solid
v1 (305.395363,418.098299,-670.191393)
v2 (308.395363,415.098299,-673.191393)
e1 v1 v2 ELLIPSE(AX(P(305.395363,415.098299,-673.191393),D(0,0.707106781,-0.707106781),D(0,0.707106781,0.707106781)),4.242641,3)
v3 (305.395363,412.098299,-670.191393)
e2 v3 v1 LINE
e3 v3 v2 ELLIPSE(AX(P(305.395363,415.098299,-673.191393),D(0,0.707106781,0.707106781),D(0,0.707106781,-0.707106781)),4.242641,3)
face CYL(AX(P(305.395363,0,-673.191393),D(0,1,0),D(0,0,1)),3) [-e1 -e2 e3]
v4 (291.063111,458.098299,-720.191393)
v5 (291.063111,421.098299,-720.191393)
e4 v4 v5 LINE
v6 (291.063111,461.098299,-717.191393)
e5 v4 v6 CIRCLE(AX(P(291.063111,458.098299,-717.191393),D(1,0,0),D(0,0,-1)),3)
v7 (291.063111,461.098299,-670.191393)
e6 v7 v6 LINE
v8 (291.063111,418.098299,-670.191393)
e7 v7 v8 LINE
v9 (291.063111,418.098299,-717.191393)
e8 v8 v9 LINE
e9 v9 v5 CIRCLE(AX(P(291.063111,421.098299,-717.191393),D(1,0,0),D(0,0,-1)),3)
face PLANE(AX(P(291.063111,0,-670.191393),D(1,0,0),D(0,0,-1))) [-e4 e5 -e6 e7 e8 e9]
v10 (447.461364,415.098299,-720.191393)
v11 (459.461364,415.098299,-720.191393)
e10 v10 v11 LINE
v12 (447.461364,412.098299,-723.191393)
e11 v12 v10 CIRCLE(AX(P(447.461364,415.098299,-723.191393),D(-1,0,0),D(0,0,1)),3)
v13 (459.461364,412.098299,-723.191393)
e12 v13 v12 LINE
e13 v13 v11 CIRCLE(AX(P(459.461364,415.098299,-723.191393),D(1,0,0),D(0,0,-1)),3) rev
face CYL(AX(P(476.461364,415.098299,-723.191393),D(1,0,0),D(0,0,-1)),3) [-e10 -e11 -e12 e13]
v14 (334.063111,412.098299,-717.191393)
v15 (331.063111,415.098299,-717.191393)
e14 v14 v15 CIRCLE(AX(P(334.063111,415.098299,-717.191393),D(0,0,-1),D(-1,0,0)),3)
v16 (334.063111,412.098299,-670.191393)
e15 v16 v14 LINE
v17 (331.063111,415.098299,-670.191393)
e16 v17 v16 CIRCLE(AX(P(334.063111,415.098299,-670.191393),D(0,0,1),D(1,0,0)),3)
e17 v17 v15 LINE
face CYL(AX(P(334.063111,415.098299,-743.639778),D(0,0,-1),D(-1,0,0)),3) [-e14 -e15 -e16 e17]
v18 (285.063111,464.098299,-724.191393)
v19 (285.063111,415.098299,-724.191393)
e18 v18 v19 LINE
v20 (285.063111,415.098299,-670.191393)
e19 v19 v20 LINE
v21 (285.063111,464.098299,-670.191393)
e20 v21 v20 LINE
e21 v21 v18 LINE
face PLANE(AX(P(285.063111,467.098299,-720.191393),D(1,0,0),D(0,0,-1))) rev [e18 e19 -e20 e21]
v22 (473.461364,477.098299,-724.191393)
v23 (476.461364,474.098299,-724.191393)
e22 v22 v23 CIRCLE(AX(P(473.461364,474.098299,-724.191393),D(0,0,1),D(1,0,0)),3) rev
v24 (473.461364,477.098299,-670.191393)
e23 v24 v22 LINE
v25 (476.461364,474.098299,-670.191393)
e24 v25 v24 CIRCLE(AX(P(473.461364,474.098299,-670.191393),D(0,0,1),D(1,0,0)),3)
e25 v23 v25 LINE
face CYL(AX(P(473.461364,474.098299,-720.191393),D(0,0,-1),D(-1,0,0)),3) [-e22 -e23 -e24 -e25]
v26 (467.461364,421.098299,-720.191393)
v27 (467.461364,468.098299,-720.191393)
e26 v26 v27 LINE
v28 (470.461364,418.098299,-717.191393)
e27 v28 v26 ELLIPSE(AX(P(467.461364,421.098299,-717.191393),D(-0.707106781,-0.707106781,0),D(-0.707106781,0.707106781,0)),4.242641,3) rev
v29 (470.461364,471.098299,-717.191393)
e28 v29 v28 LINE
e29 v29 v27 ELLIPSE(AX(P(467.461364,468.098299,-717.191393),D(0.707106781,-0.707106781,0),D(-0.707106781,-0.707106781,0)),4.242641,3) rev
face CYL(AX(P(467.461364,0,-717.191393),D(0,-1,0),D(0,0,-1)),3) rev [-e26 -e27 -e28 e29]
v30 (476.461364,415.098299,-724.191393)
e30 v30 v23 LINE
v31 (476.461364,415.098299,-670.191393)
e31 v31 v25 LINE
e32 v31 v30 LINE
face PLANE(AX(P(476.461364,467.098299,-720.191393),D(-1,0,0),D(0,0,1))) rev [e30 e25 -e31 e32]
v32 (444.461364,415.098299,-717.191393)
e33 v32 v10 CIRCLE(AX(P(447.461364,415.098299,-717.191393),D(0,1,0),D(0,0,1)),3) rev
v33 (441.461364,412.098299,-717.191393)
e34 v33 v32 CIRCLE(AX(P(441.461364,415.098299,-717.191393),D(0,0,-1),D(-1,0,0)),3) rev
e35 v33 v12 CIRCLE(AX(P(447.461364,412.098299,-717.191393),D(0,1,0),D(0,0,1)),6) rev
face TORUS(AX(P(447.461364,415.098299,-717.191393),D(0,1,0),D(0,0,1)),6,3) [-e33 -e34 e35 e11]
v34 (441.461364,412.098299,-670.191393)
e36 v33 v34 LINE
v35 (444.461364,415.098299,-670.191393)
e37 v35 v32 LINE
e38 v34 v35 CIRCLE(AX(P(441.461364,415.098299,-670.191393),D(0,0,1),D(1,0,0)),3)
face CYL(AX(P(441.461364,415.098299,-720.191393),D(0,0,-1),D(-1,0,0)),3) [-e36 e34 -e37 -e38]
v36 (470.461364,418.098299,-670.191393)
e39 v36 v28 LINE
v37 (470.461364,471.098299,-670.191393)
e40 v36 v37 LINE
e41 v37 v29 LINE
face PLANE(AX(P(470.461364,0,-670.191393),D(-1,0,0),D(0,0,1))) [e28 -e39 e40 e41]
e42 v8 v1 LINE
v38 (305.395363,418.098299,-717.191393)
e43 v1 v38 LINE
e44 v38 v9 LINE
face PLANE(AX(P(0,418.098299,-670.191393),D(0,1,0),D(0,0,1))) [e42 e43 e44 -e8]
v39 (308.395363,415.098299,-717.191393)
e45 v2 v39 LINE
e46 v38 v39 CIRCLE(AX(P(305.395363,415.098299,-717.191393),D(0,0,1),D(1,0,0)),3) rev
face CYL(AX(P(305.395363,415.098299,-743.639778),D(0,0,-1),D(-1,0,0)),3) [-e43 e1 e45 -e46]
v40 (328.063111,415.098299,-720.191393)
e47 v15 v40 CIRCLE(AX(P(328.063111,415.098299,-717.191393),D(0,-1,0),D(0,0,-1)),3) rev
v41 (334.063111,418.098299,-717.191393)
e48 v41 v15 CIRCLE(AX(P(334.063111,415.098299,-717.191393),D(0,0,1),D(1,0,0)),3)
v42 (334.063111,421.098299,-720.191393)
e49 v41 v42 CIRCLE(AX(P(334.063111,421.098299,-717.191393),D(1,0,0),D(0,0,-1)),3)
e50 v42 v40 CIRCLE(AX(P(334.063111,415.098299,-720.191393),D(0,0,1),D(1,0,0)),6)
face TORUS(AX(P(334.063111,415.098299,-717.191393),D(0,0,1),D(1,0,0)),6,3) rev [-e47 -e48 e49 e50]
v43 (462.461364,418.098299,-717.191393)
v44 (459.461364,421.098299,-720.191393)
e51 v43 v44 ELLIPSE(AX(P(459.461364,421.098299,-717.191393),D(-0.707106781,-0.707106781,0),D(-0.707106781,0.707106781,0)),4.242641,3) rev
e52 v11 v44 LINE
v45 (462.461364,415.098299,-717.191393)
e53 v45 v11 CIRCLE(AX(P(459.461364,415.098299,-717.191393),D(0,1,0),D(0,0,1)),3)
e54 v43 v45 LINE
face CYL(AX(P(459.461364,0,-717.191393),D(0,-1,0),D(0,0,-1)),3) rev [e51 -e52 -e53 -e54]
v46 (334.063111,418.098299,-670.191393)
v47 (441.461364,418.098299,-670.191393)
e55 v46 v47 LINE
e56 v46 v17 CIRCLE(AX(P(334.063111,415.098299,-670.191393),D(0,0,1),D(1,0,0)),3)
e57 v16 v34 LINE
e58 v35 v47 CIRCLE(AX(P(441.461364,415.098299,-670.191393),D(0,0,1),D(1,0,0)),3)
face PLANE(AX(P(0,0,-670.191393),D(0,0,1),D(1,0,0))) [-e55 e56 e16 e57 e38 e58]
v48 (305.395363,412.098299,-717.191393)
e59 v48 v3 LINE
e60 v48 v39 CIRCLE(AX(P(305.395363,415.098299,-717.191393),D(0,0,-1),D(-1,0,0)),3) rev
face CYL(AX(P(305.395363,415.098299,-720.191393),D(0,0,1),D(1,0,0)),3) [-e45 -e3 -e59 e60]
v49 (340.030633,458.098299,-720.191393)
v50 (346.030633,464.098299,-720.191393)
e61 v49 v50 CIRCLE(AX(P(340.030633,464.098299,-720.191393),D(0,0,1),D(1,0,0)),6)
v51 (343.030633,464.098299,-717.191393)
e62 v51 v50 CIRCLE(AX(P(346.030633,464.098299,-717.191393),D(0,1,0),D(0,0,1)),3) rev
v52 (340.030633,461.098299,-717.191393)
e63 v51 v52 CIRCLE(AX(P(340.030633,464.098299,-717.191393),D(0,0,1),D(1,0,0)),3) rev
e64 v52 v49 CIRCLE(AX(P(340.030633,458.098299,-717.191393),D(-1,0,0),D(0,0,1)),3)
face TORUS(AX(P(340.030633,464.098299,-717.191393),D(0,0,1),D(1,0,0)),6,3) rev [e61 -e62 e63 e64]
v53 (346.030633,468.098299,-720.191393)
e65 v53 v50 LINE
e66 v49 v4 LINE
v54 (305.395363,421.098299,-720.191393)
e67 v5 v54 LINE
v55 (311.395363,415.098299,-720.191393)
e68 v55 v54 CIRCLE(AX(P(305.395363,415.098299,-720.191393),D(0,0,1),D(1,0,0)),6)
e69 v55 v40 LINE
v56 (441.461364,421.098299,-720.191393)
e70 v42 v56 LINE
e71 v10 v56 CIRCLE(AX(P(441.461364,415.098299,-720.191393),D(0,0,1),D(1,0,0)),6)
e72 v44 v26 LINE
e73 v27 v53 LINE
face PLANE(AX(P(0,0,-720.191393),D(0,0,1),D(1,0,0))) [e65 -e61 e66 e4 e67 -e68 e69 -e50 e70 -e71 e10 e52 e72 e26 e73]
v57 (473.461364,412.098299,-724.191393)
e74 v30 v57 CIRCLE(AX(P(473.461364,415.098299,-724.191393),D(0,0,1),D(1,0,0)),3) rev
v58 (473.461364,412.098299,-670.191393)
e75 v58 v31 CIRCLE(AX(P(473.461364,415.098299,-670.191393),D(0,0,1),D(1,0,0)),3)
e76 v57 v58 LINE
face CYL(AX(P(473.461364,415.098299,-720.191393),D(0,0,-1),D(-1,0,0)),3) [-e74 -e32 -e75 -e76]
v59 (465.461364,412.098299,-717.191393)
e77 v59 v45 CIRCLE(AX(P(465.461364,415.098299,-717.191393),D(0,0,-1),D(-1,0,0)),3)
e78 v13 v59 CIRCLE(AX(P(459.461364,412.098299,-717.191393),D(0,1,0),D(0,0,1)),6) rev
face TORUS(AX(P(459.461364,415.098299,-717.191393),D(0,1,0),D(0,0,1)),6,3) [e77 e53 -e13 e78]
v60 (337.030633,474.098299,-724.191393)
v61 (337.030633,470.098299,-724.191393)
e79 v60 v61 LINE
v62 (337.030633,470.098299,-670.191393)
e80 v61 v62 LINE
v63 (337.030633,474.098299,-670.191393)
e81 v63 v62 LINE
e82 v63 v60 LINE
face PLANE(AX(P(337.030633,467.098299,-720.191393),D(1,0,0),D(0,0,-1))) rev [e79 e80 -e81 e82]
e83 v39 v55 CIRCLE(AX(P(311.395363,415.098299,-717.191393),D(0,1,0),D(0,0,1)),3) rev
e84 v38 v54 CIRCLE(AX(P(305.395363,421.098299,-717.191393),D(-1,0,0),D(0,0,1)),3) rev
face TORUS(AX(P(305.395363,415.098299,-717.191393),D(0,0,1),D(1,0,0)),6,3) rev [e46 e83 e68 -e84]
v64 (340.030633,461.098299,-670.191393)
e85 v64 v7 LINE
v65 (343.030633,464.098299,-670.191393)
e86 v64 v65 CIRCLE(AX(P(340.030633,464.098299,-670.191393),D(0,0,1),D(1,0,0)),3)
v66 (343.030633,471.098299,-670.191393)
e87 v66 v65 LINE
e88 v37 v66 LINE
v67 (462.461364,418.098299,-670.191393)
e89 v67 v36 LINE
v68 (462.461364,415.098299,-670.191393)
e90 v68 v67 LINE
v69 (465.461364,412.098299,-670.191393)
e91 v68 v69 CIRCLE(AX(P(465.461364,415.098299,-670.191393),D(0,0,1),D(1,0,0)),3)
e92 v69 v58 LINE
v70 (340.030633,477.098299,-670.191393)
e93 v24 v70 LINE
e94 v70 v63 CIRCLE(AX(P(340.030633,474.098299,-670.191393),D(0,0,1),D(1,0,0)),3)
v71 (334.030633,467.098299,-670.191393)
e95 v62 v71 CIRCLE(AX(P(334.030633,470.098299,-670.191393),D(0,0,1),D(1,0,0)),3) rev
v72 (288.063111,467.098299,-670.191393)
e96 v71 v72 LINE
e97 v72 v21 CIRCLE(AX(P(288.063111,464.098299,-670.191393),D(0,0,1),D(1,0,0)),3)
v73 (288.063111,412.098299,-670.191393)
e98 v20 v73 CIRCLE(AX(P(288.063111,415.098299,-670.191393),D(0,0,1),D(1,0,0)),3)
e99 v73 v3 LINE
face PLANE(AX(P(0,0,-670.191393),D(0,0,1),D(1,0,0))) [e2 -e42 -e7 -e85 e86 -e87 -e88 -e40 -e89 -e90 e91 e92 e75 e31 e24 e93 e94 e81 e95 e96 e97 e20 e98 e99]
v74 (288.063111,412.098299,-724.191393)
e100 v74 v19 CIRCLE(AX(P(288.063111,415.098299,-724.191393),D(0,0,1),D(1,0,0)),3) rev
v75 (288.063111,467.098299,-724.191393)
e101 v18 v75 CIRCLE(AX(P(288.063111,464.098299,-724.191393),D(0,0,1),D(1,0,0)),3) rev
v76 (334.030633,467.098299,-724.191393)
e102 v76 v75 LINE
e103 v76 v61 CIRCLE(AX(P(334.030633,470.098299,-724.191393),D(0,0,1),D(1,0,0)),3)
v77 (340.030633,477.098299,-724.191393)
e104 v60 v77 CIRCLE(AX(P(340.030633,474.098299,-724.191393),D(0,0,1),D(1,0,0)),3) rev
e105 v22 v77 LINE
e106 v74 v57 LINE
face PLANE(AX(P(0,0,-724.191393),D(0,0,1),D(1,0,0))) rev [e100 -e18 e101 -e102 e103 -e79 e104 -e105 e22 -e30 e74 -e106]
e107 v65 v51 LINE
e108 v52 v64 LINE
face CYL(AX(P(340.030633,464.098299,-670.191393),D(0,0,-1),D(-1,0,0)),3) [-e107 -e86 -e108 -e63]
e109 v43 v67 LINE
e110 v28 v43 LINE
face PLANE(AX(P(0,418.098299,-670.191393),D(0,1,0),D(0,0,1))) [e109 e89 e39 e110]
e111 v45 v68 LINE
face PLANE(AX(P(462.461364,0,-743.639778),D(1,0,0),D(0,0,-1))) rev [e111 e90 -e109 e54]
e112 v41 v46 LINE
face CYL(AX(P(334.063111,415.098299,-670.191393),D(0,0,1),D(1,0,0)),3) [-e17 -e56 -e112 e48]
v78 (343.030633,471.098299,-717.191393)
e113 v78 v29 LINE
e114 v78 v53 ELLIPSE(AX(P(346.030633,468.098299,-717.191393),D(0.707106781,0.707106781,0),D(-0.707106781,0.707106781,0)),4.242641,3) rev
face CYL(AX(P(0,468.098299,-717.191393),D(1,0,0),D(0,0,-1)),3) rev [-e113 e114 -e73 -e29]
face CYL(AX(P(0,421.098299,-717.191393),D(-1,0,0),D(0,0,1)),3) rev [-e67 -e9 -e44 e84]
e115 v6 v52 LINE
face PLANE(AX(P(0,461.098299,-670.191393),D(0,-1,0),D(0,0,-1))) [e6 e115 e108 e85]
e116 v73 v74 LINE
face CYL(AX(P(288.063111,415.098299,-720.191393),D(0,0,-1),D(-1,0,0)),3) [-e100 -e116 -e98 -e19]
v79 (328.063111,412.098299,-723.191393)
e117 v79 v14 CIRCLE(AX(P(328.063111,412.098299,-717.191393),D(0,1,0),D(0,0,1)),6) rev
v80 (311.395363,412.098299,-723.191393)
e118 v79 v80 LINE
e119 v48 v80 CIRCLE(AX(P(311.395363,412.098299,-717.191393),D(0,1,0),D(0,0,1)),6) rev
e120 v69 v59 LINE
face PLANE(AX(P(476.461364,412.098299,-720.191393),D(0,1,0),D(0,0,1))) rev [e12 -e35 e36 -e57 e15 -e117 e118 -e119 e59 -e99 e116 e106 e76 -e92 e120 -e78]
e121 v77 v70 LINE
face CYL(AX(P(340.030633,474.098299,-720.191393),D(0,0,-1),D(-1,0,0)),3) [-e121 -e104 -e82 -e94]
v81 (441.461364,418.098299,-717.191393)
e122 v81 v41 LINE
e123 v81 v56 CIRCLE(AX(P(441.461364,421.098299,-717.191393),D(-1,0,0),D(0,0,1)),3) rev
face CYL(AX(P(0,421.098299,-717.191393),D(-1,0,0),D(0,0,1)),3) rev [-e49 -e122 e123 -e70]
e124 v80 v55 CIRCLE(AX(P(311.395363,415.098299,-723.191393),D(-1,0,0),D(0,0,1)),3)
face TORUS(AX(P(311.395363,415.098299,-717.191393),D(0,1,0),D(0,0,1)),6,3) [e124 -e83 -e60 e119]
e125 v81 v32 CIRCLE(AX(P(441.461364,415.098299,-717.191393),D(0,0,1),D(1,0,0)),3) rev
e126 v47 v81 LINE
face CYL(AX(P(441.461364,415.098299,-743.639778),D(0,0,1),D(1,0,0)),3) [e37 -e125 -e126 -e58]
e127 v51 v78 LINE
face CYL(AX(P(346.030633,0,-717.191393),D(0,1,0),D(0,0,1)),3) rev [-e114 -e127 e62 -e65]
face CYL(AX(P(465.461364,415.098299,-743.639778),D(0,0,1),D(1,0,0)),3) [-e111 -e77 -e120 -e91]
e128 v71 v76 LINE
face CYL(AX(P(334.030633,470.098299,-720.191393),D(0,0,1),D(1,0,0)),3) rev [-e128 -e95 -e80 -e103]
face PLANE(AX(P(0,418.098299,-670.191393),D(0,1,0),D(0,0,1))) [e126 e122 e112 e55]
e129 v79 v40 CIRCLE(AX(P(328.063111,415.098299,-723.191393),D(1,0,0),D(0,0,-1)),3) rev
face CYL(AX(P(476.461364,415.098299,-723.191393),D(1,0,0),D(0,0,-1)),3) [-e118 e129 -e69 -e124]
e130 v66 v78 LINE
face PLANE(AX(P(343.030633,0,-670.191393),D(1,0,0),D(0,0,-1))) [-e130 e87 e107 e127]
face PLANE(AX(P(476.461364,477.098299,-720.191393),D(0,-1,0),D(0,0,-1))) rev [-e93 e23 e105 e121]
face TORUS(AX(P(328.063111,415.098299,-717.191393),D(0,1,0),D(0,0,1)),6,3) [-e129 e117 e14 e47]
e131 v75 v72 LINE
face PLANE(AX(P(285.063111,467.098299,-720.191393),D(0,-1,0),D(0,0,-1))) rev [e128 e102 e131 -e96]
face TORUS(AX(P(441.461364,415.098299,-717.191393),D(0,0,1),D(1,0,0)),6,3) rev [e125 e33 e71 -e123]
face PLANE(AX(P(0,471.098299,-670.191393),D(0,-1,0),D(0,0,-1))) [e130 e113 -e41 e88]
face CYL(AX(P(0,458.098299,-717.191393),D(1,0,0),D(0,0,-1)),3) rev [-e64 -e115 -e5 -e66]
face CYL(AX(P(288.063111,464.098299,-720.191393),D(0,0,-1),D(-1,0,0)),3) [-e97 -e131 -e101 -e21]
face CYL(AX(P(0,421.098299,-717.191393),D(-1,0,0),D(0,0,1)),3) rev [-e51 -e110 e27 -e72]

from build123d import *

# Parameters (mm, degrees)
BOSS_EXTRUDE1_DEPTH     = 4
BOSS_EXTRUDE2_DEPTH     = 50
CUT_EXTRUDE1_DEPTH      = 677.427541211
CUT_EXTRUDE1_DEPTH_BACK = 50
SKETCH3_W               = 22.667747696
SKETCH3_H               = 6
SKETCH3_W_2             = 18
FILLET3_R               = 3


with BuildPart() as part:
    # Sketch1 → Boss-Extrude1 (new body)
    with BuildSketch(Plane.XY.offset(-724.191392871)):
        Polygon((476.461364297, 467.098298929), (476.461364297, 412.098298929), (285.063110998, 412.098298929), (285.063110998, 467.098298929), (337.030633325, 467.098298929), (337.030633325, 477.098298929), (476.461364297, 477.098298929), align=None)
    extrude(amount=BOSS_EXTRUDE1_DEPTH)

    # Sketch2 → Boss-Extrude2 (add)
    with BuildSketch(Plane.XY.offset(-720.191392871)):
        Polygon((285.063110998, 467.098298929), (285.063110998, 412.098298929), (476.461364297, 412.098298929), (476.461364297, 477.098298929), (337.030633325, 477.098298929), (337.030633325, 467.098298929), align=None)
        Polygon((291.063110998, 461.098298929), (343.030633325, 461.098298929), (343.030633325, 471.098298929), (470.461364297, 471.098298929), (470.461364297, 418.098298929), (291.063110998, 418.098298929), align=None, mode=Mode.SUBTRACT)
    extrude(amount=BOSS_EXTRUDE2_DEPTH)

    # Sketch3 → Cut-Extrude1 (cut, two sides: drawn at the far end of the back side and taken through both)
    with BuildSketch(Plane.XY.offset(-670.191392871).offset(-CUT_EXTRUDE1_DEPTH_BACK)):
        with Locations((319.72923715, 415.098298929)):
            Rectangle(SKETCH3_W, SKETCH3_H)
        with Locations((453.461364297, 415.098298929)):
            Rectangle(SKETCH3_W_2, SKETCH3_H)
    extrude(amount=CUT_EXTRUDE1_DEPTH + CUT_EXTRUDE1_DEPTH_BACK, mode=Mode.SUBTRACT)

    # Fillet3
    fillet3_edges = [part.edges().sort_by_distance(p)[0] for p in [
        (337.030633325, 477.098298929, -697.191392871),
        (476.461364297, 477.098298929, -697.191392871),
        (476.461364297, 412.098298929, -697.191392871),
        (285.063110998, 412.098298929, -697.191392871),
        (285.063110998, 467.098298929, -697.191392871),
        (337.030633325, 467.098298929, -697.191392871),
        (343.030633325, 461.098298929, -695.191392871),
        (406.745998811, 471.098298929, -720.191392871),
        (343.030633325, 466.098298929, -720.191392871),
        (317.046872162, 461.098298929, -720.191392871),
        (299.72923715, 418.098298929, -720.191392871),
        (470.461364297, 444.598298929, -720.191392871),
        (387.762237648, 418.098298929, -720.191392871),
        (466.461364297, 418.098298929, -720.191392871),
        (308.395363302, 415.098298929, -670.191392871),
        (331.063110998, 418.098298929, -695.191392871),
        (331.063110998, 415.098298929, -720.191392871),
        (331.063110998, 412.098298929, -695.191392871),
        (308.395363302, 412.098298929, -695.191392871),
        (308.395363302, 418.098298929, -695.191392871),
        (319.72923715, 412.098298929, -720.191392871),
        (308.395363302, 415.098298929, -720.191392871),
        (444.461364297, 412.098298929, -695.191392871),
        (444.461364297, 415.098298929, -720.191392871),
        (444.461364297, 418.098298929, -695.191392871),
        (462.461364297, 412.098298929, -695.191392871),
        (462.461364297, 415.098298929, -720.191392871),
        (453.461364297, 412.098298929, -720.191392871),
    ]]
    fillet(fillet3_edges, radius=FILLET3_R - 0.0001)  # a hair under: the kernel refuses the full size


solid = part.part
